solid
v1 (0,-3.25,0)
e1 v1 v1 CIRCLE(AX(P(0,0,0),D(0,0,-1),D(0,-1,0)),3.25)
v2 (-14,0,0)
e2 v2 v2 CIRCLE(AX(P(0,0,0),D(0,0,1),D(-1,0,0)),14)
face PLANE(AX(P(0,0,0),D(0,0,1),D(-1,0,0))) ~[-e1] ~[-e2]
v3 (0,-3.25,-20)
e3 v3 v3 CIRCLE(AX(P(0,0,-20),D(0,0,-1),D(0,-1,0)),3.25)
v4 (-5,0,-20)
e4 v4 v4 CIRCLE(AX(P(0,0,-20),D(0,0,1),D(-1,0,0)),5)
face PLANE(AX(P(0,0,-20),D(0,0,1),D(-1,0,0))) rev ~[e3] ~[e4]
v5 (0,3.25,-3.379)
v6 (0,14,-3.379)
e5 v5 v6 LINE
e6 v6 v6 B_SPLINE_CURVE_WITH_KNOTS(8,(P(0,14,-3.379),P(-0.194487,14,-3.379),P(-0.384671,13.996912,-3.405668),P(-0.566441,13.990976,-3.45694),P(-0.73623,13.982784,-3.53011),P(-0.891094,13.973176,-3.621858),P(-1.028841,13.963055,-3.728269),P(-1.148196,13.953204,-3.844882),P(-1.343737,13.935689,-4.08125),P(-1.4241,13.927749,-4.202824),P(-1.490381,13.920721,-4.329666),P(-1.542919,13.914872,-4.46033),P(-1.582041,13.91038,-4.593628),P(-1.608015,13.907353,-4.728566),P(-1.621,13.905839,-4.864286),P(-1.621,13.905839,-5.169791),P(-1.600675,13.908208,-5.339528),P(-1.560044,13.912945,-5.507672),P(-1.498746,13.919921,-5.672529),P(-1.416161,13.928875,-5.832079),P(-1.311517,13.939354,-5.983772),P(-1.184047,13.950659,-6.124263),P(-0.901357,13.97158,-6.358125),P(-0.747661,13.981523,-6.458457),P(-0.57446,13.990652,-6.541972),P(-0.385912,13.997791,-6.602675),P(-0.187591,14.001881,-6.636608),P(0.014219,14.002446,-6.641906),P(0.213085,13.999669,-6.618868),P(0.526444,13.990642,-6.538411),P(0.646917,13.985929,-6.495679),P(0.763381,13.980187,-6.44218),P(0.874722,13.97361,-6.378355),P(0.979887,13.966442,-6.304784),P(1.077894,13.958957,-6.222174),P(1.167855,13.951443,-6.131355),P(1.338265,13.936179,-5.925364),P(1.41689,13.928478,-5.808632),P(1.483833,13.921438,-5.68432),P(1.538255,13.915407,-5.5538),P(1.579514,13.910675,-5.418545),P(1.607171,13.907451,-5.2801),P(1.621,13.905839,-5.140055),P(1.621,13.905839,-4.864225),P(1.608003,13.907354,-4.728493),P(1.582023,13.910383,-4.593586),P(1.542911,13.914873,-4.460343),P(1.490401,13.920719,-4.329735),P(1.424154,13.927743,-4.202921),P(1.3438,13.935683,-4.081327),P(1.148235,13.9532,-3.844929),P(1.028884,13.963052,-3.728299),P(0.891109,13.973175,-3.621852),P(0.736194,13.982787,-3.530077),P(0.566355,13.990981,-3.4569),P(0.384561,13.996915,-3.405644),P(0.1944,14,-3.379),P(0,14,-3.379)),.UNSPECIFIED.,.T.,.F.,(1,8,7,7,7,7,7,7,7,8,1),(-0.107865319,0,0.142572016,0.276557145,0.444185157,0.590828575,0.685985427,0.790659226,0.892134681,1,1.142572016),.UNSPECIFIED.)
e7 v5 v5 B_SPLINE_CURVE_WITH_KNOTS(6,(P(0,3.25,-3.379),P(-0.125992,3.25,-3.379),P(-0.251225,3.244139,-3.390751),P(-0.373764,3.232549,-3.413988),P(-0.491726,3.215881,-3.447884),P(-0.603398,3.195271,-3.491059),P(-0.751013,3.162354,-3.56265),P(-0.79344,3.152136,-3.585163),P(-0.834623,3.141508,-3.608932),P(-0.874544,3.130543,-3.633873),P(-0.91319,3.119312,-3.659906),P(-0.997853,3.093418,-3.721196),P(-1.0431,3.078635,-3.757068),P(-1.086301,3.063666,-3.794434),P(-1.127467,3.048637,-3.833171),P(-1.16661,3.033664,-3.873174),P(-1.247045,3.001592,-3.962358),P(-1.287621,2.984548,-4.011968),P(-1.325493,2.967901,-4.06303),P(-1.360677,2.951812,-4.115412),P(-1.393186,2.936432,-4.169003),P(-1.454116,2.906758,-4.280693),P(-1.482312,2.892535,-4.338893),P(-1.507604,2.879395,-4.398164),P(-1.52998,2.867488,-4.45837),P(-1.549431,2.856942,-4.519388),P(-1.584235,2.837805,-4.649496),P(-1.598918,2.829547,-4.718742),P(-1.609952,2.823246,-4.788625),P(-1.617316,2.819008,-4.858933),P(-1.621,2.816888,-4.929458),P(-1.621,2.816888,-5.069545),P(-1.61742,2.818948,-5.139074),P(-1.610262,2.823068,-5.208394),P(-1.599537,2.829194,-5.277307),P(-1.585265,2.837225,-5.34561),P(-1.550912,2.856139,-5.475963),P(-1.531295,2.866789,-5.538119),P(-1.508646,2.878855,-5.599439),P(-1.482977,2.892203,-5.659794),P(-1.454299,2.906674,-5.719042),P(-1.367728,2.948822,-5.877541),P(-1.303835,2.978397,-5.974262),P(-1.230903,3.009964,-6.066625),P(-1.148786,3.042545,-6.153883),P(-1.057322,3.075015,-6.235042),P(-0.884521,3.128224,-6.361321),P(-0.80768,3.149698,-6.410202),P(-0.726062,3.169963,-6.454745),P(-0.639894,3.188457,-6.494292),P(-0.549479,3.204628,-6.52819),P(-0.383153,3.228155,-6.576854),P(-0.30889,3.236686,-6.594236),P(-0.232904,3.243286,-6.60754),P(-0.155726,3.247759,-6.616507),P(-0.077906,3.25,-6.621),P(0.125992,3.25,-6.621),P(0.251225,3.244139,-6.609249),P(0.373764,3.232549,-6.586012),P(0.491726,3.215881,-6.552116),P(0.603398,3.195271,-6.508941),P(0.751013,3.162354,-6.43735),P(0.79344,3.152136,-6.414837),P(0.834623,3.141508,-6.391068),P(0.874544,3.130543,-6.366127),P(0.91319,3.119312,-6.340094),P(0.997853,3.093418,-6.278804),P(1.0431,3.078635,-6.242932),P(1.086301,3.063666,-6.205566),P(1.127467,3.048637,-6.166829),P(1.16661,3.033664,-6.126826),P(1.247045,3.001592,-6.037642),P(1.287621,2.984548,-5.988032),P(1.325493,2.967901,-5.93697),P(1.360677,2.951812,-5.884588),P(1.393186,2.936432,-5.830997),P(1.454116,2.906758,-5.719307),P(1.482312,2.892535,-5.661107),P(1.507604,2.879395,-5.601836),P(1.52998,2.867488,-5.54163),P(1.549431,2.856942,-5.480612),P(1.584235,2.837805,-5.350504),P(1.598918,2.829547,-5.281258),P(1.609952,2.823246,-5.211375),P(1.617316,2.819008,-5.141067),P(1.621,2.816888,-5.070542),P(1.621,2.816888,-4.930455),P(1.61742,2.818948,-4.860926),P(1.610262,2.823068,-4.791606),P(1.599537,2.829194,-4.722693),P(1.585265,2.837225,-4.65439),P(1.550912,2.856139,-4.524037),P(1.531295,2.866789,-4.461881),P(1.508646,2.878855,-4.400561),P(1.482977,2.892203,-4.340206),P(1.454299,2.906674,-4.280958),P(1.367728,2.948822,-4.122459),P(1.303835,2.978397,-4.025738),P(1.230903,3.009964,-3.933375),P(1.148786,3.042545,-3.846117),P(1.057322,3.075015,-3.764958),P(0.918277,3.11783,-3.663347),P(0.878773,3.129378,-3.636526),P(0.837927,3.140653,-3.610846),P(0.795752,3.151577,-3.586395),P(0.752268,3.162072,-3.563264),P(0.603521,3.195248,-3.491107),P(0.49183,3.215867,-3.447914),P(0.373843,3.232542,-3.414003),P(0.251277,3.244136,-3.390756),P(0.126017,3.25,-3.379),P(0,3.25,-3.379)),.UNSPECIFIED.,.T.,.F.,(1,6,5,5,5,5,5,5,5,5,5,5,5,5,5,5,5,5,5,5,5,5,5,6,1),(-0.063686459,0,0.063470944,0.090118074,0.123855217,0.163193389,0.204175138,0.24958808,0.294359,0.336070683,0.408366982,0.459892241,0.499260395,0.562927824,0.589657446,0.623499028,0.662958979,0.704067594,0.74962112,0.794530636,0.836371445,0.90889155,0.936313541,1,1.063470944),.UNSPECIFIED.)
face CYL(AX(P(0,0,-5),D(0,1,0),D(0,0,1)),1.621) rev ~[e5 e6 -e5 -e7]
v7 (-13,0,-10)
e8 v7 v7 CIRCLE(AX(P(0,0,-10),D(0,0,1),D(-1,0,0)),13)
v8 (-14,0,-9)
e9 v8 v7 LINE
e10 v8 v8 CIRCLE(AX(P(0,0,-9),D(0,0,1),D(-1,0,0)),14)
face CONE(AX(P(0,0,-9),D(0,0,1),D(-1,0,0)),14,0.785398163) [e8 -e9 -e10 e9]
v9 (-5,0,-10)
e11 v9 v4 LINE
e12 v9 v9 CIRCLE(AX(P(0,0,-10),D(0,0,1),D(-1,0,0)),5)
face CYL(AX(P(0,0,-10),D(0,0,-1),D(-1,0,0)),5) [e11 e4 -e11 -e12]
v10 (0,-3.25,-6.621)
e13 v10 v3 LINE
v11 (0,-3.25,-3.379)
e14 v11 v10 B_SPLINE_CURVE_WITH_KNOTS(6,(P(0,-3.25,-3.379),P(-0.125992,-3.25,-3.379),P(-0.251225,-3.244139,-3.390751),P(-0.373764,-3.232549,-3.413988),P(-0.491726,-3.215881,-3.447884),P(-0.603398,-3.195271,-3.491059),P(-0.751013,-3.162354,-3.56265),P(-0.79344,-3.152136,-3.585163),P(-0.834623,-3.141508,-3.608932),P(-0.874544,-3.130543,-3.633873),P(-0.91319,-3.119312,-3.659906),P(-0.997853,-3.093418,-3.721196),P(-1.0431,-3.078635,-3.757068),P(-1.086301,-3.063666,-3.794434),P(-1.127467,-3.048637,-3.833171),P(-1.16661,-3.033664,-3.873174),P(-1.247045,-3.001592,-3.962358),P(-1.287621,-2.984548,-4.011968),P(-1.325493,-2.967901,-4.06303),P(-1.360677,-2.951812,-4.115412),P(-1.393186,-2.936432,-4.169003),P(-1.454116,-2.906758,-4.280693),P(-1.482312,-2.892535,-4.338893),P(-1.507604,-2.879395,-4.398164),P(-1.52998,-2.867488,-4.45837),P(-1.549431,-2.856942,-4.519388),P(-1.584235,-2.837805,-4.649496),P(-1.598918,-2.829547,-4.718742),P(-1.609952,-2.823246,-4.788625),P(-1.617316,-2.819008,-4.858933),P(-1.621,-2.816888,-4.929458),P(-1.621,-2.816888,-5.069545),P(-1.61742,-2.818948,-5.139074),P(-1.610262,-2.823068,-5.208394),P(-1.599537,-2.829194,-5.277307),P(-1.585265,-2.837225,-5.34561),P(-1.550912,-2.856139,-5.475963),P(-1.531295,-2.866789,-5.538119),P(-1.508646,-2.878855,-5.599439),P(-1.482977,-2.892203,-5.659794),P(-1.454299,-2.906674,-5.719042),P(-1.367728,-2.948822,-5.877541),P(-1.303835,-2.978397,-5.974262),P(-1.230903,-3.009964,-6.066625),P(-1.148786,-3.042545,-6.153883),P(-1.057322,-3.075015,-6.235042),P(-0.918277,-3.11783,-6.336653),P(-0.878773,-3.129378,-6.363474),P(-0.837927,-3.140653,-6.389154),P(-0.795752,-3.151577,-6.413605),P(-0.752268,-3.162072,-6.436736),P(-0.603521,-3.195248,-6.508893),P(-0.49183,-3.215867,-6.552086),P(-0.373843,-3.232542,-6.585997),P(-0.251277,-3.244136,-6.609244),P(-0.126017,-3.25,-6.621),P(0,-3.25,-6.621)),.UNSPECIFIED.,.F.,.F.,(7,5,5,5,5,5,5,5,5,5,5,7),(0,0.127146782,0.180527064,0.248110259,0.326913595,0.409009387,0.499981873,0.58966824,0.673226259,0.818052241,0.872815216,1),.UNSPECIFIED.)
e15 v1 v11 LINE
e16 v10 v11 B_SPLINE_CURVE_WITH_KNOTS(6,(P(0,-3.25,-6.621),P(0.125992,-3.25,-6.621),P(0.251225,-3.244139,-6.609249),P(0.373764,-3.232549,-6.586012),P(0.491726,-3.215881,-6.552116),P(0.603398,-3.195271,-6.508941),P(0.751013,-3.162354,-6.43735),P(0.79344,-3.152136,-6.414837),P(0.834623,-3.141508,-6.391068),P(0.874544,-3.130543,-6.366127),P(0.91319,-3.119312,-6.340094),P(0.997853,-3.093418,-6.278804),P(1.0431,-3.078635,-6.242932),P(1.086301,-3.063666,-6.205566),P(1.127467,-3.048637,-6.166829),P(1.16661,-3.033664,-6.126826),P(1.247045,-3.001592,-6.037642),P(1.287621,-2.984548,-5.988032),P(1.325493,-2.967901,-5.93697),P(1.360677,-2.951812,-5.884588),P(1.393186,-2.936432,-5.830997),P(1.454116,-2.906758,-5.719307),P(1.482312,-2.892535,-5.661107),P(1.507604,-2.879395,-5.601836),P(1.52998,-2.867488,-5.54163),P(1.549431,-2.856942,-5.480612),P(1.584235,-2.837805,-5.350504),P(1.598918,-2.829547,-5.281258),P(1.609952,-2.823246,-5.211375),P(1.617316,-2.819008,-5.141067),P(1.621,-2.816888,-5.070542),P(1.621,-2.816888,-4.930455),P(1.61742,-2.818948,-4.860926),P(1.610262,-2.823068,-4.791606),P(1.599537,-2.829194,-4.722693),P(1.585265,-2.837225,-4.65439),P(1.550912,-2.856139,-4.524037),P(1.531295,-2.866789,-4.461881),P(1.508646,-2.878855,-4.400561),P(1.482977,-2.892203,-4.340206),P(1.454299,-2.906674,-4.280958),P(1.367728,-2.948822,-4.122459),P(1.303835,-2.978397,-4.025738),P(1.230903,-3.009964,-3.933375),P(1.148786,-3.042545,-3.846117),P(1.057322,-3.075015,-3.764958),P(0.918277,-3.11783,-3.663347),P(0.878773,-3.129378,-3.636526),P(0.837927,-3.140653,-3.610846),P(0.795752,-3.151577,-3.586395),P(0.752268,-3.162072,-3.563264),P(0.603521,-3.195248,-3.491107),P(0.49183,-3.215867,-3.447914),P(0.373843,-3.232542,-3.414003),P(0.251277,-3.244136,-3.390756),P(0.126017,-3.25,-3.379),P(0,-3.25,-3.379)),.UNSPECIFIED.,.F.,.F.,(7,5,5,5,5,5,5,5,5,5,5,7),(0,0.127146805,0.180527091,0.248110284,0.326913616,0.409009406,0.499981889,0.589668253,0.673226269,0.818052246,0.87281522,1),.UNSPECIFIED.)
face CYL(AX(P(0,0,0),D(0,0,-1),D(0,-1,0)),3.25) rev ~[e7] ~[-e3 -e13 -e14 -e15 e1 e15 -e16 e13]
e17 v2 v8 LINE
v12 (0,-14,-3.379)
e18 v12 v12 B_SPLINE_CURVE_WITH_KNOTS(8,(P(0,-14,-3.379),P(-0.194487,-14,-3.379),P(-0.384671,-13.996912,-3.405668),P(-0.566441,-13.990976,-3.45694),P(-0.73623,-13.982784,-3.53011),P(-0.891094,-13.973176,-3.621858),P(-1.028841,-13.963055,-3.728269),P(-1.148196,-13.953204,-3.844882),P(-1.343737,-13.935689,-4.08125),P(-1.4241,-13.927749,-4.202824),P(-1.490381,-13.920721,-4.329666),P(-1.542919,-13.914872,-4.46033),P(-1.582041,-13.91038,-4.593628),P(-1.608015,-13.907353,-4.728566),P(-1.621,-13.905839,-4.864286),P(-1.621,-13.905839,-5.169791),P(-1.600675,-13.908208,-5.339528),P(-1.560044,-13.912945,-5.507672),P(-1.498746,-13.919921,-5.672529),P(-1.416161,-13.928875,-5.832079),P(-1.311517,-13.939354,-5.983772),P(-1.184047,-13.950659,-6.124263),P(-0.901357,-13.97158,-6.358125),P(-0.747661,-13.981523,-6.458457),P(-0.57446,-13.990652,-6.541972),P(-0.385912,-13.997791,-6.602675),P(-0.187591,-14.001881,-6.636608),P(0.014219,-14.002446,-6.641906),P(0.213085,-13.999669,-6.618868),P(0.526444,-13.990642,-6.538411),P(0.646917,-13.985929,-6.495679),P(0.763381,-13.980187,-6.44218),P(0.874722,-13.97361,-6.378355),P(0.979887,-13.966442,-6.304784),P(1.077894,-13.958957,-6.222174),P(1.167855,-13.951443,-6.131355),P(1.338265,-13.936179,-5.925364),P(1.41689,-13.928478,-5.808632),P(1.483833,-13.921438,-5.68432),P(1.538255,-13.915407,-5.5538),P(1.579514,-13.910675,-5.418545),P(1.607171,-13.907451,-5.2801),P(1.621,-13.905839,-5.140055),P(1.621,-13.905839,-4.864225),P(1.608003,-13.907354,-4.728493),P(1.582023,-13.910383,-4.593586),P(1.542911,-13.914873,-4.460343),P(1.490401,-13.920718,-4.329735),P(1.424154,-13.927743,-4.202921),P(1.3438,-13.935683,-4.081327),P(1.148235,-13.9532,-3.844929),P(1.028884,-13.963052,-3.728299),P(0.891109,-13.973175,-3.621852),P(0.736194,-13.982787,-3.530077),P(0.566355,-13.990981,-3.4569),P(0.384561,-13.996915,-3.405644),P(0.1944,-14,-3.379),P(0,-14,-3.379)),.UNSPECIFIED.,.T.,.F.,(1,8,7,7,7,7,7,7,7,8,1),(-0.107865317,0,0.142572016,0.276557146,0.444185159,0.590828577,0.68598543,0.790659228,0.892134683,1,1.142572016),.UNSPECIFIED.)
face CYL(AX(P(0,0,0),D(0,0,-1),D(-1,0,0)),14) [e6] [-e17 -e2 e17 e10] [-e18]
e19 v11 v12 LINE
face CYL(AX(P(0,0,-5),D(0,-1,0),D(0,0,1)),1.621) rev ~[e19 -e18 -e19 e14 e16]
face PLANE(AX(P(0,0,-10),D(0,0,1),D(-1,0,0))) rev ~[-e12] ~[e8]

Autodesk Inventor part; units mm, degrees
ref_plane "YZ Plane" through (0, 0, 0) normal (1, 0, 0) x (0, 1, 0)
ref_plane "XZ Plane" through (0, 0, 0) normal (0, 1, 0) x (-1, 0, 0)
ref_plane "XY Plane" through (0, 0, 0) normal (0, 0, 1) x (1, 0, 0)
sketch "Skizze1" plane through (0, 0, 0) normal (0, 1, 0) x (-1, 0, 0)
  line L0 (0, 0) -> (14, 0)
  line L1 (14, 0) -> (14, -10)
  line L2 (14, -10) -> (5, -10)
  line L3 (5, -10) -> (5, -20)
  line L4 (5, -20) -> (0, -20)
  line L5 (0, -20) -> (0, 0)
  point P0 (9.5, -10)
  dimension "d0" = 10
  dimension "d1" = 10
  dimension "d2" = 10
  dimension "d3" = 28
revolve "Umdrehung1" add sketch "Skizze1" angle 360 about axis through (0, 0, -20) along (0, 0, 1)
sketch "Skizze2" plane through (0, 0, 0) normal (0, 0, 1) x (1, 0, 0)
  circle A0 centre (0, 0) radius 14 projected
  point P0 (0, 0)
hole "Bohrung1" at (0, 0, 0) direction (0, 0, -1) diameter 6.5 depth 20
sketch "Skizze4" plane through (0, 0, 0) normal (0, 1, 0) x (-1, 0, 0)
  line L0 (-3.25, 0) -> (3.25, 0) projected
  point P0 (0, 0)
  point P1 (0, -5)
  dimension "d12" = 5
hole "Bohrung2" at (0, 0, -5) direction (0, -1, 0) diameter 3.242 end through all thread size "M4x0.7" class "6H" standard "ISO Metric profile"
mirror "Spiegeln1" about plane through (0, 0, 0) normal (0, 1, 0) of "Bohrung2"
chamfer "Fasen1" distance 1 angle 45 1 edges at (14, 0, -10)
properties part number "30" material "Kupfer"
